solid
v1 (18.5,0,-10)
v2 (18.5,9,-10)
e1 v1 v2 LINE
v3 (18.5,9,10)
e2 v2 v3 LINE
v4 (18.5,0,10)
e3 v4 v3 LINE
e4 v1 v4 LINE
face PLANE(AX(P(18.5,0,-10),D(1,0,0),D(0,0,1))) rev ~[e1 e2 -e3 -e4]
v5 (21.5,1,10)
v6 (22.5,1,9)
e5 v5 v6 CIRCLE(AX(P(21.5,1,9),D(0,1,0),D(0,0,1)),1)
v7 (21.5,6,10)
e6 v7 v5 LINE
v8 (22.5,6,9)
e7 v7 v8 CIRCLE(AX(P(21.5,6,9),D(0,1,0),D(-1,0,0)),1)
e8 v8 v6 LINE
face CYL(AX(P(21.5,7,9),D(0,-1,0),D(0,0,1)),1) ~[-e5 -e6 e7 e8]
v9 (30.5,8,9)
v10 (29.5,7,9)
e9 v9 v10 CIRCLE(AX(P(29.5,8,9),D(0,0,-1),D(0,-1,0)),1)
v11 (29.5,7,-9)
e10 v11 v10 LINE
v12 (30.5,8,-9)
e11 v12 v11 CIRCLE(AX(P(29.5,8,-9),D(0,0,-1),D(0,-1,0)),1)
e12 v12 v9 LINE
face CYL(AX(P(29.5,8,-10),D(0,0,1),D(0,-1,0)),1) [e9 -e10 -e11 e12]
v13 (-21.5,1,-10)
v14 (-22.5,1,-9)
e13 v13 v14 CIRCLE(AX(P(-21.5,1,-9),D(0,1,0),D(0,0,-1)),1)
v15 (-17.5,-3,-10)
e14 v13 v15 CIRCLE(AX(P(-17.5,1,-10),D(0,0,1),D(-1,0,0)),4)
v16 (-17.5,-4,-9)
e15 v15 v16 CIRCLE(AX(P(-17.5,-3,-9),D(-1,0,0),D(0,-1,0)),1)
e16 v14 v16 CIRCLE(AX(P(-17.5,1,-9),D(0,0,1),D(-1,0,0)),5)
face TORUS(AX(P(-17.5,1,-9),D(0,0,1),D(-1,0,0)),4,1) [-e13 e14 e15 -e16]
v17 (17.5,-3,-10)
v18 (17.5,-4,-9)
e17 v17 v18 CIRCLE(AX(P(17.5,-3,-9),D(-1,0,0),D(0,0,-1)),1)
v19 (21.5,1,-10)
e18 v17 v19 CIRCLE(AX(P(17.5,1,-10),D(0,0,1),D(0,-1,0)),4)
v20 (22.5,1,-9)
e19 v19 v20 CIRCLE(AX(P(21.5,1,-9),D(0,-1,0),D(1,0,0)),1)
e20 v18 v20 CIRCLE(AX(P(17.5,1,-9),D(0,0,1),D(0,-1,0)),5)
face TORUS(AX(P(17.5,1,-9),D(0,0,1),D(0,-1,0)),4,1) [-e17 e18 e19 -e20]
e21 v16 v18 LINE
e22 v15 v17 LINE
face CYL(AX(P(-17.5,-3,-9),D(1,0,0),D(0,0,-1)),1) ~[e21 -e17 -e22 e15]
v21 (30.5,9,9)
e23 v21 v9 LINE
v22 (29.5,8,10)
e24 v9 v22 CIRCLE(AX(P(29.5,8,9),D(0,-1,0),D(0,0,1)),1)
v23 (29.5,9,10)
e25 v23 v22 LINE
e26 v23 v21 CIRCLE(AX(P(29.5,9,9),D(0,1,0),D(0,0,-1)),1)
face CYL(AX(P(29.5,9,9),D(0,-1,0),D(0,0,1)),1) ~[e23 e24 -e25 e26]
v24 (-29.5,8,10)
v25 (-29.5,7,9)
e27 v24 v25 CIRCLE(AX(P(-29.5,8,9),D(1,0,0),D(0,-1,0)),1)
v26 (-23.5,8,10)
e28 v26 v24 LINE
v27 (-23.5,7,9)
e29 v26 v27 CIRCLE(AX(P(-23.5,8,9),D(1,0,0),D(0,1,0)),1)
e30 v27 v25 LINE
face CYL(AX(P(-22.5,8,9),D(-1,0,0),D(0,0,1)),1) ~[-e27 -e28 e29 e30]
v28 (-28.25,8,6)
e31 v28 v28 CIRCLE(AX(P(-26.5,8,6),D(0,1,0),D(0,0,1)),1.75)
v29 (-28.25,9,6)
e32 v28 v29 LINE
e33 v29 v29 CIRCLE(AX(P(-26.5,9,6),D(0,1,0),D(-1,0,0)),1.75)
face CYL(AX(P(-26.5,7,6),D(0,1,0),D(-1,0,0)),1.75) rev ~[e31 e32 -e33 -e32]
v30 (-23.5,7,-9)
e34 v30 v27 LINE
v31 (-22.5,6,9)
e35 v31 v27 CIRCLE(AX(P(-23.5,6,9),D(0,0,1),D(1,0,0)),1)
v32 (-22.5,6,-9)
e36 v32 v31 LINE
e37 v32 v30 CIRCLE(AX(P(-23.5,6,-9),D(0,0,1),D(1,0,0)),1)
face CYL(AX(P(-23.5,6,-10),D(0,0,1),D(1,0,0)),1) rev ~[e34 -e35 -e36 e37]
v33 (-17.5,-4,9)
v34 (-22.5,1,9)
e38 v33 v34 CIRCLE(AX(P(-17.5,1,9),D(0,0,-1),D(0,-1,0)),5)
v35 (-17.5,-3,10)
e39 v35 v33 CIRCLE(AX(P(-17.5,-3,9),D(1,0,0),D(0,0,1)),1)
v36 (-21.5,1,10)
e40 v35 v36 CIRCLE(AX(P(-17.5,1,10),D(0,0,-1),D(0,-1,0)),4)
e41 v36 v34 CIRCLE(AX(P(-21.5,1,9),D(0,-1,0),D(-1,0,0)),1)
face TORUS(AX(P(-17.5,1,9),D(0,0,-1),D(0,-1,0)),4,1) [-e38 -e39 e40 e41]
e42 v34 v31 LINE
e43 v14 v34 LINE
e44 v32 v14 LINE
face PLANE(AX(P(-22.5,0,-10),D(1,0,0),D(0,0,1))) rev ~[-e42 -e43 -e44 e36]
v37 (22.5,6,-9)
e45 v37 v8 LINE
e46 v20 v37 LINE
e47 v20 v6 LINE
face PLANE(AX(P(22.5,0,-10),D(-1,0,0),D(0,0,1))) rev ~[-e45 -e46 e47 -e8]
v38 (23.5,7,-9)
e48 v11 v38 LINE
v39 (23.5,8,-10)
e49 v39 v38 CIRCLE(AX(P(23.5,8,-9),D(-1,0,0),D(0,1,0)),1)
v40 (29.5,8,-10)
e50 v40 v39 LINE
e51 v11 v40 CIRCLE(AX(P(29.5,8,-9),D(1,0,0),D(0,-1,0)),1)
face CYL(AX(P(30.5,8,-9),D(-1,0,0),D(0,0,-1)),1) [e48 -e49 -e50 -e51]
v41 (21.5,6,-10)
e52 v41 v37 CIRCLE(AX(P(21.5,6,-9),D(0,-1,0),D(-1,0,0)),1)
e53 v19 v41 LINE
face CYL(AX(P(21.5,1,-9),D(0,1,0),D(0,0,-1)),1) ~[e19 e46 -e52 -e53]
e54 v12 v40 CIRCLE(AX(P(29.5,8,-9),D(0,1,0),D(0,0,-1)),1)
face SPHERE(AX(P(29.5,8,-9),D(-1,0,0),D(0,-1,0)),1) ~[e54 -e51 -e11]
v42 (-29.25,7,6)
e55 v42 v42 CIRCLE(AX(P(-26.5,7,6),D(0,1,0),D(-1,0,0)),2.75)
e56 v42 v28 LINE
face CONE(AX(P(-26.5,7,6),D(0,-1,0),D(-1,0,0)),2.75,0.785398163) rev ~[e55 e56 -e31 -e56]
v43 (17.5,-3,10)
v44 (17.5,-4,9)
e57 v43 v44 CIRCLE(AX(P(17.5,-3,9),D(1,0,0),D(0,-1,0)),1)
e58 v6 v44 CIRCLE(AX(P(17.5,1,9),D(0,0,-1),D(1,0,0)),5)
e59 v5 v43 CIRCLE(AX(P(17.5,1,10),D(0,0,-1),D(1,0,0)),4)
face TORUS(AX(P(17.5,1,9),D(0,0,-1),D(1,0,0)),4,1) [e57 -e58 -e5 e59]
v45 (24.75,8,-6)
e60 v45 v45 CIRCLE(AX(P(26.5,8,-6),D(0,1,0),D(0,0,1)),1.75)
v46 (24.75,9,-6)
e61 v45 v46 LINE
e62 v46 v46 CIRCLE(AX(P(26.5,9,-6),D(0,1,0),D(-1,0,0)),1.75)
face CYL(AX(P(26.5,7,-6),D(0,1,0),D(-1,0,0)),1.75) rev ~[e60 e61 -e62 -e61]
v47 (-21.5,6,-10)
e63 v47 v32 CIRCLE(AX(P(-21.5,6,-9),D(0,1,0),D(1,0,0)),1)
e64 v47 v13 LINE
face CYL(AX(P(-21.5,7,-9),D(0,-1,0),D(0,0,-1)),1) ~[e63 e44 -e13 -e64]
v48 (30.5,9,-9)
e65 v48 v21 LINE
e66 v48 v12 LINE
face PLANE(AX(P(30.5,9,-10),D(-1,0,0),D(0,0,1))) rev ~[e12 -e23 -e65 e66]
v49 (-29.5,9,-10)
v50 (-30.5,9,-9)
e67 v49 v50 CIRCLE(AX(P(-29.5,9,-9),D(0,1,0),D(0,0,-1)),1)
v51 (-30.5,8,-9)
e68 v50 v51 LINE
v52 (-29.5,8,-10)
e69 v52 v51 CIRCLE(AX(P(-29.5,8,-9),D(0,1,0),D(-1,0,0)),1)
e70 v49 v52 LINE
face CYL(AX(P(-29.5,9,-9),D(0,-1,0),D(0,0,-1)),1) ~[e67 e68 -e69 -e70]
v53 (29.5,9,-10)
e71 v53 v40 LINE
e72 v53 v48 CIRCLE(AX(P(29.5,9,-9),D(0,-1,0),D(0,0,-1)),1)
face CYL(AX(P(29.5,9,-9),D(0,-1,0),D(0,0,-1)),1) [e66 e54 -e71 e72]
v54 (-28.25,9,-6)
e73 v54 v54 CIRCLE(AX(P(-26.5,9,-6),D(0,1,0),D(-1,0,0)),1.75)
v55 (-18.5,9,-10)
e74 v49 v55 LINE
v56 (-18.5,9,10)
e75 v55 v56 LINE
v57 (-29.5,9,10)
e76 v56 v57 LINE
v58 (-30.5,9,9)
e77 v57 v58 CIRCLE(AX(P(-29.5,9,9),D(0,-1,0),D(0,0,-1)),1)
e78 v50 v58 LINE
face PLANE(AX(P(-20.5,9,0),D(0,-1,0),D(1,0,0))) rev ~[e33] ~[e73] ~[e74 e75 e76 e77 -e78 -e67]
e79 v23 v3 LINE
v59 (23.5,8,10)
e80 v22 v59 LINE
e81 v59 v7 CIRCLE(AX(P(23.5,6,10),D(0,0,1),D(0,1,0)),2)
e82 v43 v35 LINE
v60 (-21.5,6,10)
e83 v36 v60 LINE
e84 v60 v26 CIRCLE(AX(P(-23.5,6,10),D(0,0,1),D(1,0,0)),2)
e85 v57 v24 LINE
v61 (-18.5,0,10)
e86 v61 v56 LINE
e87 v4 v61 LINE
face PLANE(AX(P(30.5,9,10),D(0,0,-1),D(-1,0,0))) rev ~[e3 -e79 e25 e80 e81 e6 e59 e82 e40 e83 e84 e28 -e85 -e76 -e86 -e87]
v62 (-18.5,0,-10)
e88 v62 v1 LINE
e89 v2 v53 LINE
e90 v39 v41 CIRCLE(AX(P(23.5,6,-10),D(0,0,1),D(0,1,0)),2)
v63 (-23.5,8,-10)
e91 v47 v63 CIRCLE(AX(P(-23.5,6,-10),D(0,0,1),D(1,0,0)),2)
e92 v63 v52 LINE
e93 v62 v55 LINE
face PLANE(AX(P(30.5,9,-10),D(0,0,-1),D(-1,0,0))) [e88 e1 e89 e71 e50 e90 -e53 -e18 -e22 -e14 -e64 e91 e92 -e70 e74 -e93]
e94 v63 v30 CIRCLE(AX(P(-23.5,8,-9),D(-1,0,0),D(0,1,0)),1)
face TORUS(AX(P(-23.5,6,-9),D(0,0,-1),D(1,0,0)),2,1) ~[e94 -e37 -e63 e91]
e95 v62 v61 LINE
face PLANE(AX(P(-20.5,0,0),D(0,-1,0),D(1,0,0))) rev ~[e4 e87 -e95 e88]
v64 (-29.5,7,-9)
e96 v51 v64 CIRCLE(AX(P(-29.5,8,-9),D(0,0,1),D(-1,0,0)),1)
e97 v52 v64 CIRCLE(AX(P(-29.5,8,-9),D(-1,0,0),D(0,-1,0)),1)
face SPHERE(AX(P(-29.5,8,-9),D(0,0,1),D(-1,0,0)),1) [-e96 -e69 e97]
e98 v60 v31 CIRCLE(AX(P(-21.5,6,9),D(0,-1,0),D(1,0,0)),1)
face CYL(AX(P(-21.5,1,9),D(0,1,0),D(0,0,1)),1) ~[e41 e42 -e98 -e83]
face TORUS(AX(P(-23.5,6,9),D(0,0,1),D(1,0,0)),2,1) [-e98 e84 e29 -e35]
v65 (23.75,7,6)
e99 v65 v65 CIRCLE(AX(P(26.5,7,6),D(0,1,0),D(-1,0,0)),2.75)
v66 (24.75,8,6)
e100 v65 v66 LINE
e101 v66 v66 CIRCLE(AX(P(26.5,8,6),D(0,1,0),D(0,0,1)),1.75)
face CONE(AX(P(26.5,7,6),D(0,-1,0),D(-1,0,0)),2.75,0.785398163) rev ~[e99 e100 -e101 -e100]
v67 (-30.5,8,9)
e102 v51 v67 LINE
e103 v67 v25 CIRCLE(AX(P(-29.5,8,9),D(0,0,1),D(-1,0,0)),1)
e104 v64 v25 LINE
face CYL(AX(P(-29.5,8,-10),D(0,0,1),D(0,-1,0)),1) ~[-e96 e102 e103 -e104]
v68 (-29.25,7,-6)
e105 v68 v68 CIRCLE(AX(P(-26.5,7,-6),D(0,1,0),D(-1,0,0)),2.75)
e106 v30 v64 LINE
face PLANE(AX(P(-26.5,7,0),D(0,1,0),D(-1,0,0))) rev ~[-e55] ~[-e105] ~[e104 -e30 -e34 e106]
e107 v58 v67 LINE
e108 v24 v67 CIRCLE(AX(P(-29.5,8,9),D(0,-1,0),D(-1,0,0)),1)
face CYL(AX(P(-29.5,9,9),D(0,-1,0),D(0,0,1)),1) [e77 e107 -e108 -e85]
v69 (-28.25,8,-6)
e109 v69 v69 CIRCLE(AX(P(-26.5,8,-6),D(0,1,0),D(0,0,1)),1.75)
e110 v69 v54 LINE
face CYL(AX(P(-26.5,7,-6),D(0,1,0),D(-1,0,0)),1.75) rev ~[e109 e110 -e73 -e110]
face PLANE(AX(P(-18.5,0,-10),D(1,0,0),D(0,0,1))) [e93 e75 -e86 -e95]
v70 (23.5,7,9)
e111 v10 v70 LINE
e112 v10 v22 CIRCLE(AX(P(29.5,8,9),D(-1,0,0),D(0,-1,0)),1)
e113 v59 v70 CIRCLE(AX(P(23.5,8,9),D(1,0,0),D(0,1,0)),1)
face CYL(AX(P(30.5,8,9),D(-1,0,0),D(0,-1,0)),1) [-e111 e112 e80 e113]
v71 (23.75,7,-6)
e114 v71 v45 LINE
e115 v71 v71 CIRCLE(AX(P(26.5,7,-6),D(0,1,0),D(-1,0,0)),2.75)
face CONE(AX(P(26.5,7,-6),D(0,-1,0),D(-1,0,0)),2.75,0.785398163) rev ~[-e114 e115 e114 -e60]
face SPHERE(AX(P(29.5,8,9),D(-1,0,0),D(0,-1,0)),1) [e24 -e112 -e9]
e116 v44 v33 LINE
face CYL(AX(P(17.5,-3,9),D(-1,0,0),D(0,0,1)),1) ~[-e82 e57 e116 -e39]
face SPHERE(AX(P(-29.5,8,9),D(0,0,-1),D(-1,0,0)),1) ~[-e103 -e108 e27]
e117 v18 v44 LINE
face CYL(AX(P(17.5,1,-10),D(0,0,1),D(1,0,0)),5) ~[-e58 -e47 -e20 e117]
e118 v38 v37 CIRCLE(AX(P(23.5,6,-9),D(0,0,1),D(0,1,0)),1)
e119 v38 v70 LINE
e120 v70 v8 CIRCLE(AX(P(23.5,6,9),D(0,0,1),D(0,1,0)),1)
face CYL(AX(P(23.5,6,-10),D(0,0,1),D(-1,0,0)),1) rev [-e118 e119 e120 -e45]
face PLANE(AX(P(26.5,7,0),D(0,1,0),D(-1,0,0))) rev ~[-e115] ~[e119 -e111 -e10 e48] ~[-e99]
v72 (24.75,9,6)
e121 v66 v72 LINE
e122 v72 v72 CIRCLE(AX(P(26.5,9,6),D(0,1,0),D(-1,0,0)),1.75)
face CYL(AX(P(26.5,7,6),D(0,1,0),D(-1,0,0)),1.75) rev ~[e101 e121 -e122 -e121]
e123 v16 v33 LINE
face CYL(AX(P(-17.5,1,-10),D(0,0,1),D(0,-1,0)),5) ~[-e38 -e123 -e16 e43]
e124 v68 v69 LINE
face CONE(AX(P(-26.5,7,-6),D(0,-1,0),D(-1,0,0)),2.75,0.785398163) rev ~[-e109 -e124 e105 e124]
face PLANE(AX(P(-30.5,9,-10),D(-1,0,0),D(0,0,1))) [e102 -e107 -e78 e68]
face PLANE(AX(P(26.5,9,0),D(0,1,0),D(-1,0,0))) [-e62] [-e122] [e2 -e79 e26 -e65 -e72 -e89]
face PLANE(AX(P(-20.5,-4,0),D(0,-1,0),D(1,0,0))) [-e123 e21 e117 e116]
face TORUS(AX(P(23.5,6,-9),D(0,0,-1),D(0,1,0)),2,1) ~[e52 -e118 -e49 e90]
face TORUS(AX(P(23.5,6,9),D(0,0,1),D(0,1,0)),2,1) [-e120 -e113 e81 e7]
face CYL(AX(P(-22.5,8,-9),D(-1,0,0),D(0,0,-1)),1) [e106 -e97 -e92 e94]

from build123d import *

# Parameters (mm, degrees)
F0_W           = 4
F0_H           = 20
F0_W_2         = 37
F1_DEPTH       = 4
F2_DEPTH       = 9
F3_W           = 8
F3_H           = 20
F4_DEPTH       = 2
F6_D           = 3.5
F6_CSINK_D     = 5.5
F6_CSINK_ANGLE = 90
F7_R           = 5
F8_R           = 1


with BuildPart() as f1:
    # F0 (on Front) → F1 (new body)
    with BuildSketch(Plane.XZ):
        with Locations((-20.5, 0)):
            Rectangle(F0_W, F0_H)
        Rectangle(F0_W_2, F0_H)
        with Locations((20.5, 0)):
            Rectangle(F0_W, F0_H)
    extrude(amount=F1_DEPTH)

    # F0 (on Front) → F2 (join)
    with BuildSketch(Plane.XZ):
        with Locations((-20.5, 0)):
            Rectangle(F0_W, F0_H)
        with Locations((20.5, 0)):
            Rectangle(F0_W, F0_H)
    extrude(amount=-F2_DEPTH)

    # F3 (on face) → F4 (join)
    with BuildSketch(Plane(origin=(0, 9, 0), x_dir=(-1, 0, 0), z_dir=(0, 1, 0))):
        with Locations((-26.5, 0)):
            Rectangle(F3_W, F3_H)
        with Locations((26.5, 0)):
            Rectangle(F3_W, F3_H)
    extrude(amount=-F4_DEPTH)

    # F6 (through all)
    with Locations(Plane.XZ.offset(-7)):
        with Locations((-26.5, -6), (-26.5, 6), (26.5, -6), (26.5, 6)):
            CounterSinkHole(F6_D / 2, F6_CSINK_D / 2, counter_sink_angle=F6_CSINK_ANGLE)

    # F7
    f7_edges = [f1.edges().sort_by_distance(p)[0] for p in [
        (22.5, -4, 0),
        (-22.5, -4, 0),
    ]]
    fillet(f7_edges, radius=F7_R)

    # F8
    f8_edges = [f1.edges().sort_by_distance(p)[0] for p in [
        (22.5, 7, 0),
        (-22.5, 7, 0),
        (26.5, 7, 10),
        (26.5, 7, -10),
        (30.5, 7, 0),
        (-30.5, 7, 0),
        (30.5, 8, 10),
        (30.5, 8, -10),
        (-30.5, 8, 10),
        (-30.5, 8, -10),
        (-22.5, 4, -10),
        (-21.035534, -2.535534, -10),
        (-26.5, 7, -10),
        (0, -4, -10),
        (21.035534, -2.535534, -10),
        (22.5, 4, -10),
        (-22.5, 4, 10),
        (-21.035534, -2.535534, 10),
        (-26.5, 7, 10),
        (0, -4, 10),
        (21.035534, -2.535534, 10),
        (22.5, 4, 10),
    ]]
    fillet(f8_edges, radius=F8_R)


solid = f1.part
